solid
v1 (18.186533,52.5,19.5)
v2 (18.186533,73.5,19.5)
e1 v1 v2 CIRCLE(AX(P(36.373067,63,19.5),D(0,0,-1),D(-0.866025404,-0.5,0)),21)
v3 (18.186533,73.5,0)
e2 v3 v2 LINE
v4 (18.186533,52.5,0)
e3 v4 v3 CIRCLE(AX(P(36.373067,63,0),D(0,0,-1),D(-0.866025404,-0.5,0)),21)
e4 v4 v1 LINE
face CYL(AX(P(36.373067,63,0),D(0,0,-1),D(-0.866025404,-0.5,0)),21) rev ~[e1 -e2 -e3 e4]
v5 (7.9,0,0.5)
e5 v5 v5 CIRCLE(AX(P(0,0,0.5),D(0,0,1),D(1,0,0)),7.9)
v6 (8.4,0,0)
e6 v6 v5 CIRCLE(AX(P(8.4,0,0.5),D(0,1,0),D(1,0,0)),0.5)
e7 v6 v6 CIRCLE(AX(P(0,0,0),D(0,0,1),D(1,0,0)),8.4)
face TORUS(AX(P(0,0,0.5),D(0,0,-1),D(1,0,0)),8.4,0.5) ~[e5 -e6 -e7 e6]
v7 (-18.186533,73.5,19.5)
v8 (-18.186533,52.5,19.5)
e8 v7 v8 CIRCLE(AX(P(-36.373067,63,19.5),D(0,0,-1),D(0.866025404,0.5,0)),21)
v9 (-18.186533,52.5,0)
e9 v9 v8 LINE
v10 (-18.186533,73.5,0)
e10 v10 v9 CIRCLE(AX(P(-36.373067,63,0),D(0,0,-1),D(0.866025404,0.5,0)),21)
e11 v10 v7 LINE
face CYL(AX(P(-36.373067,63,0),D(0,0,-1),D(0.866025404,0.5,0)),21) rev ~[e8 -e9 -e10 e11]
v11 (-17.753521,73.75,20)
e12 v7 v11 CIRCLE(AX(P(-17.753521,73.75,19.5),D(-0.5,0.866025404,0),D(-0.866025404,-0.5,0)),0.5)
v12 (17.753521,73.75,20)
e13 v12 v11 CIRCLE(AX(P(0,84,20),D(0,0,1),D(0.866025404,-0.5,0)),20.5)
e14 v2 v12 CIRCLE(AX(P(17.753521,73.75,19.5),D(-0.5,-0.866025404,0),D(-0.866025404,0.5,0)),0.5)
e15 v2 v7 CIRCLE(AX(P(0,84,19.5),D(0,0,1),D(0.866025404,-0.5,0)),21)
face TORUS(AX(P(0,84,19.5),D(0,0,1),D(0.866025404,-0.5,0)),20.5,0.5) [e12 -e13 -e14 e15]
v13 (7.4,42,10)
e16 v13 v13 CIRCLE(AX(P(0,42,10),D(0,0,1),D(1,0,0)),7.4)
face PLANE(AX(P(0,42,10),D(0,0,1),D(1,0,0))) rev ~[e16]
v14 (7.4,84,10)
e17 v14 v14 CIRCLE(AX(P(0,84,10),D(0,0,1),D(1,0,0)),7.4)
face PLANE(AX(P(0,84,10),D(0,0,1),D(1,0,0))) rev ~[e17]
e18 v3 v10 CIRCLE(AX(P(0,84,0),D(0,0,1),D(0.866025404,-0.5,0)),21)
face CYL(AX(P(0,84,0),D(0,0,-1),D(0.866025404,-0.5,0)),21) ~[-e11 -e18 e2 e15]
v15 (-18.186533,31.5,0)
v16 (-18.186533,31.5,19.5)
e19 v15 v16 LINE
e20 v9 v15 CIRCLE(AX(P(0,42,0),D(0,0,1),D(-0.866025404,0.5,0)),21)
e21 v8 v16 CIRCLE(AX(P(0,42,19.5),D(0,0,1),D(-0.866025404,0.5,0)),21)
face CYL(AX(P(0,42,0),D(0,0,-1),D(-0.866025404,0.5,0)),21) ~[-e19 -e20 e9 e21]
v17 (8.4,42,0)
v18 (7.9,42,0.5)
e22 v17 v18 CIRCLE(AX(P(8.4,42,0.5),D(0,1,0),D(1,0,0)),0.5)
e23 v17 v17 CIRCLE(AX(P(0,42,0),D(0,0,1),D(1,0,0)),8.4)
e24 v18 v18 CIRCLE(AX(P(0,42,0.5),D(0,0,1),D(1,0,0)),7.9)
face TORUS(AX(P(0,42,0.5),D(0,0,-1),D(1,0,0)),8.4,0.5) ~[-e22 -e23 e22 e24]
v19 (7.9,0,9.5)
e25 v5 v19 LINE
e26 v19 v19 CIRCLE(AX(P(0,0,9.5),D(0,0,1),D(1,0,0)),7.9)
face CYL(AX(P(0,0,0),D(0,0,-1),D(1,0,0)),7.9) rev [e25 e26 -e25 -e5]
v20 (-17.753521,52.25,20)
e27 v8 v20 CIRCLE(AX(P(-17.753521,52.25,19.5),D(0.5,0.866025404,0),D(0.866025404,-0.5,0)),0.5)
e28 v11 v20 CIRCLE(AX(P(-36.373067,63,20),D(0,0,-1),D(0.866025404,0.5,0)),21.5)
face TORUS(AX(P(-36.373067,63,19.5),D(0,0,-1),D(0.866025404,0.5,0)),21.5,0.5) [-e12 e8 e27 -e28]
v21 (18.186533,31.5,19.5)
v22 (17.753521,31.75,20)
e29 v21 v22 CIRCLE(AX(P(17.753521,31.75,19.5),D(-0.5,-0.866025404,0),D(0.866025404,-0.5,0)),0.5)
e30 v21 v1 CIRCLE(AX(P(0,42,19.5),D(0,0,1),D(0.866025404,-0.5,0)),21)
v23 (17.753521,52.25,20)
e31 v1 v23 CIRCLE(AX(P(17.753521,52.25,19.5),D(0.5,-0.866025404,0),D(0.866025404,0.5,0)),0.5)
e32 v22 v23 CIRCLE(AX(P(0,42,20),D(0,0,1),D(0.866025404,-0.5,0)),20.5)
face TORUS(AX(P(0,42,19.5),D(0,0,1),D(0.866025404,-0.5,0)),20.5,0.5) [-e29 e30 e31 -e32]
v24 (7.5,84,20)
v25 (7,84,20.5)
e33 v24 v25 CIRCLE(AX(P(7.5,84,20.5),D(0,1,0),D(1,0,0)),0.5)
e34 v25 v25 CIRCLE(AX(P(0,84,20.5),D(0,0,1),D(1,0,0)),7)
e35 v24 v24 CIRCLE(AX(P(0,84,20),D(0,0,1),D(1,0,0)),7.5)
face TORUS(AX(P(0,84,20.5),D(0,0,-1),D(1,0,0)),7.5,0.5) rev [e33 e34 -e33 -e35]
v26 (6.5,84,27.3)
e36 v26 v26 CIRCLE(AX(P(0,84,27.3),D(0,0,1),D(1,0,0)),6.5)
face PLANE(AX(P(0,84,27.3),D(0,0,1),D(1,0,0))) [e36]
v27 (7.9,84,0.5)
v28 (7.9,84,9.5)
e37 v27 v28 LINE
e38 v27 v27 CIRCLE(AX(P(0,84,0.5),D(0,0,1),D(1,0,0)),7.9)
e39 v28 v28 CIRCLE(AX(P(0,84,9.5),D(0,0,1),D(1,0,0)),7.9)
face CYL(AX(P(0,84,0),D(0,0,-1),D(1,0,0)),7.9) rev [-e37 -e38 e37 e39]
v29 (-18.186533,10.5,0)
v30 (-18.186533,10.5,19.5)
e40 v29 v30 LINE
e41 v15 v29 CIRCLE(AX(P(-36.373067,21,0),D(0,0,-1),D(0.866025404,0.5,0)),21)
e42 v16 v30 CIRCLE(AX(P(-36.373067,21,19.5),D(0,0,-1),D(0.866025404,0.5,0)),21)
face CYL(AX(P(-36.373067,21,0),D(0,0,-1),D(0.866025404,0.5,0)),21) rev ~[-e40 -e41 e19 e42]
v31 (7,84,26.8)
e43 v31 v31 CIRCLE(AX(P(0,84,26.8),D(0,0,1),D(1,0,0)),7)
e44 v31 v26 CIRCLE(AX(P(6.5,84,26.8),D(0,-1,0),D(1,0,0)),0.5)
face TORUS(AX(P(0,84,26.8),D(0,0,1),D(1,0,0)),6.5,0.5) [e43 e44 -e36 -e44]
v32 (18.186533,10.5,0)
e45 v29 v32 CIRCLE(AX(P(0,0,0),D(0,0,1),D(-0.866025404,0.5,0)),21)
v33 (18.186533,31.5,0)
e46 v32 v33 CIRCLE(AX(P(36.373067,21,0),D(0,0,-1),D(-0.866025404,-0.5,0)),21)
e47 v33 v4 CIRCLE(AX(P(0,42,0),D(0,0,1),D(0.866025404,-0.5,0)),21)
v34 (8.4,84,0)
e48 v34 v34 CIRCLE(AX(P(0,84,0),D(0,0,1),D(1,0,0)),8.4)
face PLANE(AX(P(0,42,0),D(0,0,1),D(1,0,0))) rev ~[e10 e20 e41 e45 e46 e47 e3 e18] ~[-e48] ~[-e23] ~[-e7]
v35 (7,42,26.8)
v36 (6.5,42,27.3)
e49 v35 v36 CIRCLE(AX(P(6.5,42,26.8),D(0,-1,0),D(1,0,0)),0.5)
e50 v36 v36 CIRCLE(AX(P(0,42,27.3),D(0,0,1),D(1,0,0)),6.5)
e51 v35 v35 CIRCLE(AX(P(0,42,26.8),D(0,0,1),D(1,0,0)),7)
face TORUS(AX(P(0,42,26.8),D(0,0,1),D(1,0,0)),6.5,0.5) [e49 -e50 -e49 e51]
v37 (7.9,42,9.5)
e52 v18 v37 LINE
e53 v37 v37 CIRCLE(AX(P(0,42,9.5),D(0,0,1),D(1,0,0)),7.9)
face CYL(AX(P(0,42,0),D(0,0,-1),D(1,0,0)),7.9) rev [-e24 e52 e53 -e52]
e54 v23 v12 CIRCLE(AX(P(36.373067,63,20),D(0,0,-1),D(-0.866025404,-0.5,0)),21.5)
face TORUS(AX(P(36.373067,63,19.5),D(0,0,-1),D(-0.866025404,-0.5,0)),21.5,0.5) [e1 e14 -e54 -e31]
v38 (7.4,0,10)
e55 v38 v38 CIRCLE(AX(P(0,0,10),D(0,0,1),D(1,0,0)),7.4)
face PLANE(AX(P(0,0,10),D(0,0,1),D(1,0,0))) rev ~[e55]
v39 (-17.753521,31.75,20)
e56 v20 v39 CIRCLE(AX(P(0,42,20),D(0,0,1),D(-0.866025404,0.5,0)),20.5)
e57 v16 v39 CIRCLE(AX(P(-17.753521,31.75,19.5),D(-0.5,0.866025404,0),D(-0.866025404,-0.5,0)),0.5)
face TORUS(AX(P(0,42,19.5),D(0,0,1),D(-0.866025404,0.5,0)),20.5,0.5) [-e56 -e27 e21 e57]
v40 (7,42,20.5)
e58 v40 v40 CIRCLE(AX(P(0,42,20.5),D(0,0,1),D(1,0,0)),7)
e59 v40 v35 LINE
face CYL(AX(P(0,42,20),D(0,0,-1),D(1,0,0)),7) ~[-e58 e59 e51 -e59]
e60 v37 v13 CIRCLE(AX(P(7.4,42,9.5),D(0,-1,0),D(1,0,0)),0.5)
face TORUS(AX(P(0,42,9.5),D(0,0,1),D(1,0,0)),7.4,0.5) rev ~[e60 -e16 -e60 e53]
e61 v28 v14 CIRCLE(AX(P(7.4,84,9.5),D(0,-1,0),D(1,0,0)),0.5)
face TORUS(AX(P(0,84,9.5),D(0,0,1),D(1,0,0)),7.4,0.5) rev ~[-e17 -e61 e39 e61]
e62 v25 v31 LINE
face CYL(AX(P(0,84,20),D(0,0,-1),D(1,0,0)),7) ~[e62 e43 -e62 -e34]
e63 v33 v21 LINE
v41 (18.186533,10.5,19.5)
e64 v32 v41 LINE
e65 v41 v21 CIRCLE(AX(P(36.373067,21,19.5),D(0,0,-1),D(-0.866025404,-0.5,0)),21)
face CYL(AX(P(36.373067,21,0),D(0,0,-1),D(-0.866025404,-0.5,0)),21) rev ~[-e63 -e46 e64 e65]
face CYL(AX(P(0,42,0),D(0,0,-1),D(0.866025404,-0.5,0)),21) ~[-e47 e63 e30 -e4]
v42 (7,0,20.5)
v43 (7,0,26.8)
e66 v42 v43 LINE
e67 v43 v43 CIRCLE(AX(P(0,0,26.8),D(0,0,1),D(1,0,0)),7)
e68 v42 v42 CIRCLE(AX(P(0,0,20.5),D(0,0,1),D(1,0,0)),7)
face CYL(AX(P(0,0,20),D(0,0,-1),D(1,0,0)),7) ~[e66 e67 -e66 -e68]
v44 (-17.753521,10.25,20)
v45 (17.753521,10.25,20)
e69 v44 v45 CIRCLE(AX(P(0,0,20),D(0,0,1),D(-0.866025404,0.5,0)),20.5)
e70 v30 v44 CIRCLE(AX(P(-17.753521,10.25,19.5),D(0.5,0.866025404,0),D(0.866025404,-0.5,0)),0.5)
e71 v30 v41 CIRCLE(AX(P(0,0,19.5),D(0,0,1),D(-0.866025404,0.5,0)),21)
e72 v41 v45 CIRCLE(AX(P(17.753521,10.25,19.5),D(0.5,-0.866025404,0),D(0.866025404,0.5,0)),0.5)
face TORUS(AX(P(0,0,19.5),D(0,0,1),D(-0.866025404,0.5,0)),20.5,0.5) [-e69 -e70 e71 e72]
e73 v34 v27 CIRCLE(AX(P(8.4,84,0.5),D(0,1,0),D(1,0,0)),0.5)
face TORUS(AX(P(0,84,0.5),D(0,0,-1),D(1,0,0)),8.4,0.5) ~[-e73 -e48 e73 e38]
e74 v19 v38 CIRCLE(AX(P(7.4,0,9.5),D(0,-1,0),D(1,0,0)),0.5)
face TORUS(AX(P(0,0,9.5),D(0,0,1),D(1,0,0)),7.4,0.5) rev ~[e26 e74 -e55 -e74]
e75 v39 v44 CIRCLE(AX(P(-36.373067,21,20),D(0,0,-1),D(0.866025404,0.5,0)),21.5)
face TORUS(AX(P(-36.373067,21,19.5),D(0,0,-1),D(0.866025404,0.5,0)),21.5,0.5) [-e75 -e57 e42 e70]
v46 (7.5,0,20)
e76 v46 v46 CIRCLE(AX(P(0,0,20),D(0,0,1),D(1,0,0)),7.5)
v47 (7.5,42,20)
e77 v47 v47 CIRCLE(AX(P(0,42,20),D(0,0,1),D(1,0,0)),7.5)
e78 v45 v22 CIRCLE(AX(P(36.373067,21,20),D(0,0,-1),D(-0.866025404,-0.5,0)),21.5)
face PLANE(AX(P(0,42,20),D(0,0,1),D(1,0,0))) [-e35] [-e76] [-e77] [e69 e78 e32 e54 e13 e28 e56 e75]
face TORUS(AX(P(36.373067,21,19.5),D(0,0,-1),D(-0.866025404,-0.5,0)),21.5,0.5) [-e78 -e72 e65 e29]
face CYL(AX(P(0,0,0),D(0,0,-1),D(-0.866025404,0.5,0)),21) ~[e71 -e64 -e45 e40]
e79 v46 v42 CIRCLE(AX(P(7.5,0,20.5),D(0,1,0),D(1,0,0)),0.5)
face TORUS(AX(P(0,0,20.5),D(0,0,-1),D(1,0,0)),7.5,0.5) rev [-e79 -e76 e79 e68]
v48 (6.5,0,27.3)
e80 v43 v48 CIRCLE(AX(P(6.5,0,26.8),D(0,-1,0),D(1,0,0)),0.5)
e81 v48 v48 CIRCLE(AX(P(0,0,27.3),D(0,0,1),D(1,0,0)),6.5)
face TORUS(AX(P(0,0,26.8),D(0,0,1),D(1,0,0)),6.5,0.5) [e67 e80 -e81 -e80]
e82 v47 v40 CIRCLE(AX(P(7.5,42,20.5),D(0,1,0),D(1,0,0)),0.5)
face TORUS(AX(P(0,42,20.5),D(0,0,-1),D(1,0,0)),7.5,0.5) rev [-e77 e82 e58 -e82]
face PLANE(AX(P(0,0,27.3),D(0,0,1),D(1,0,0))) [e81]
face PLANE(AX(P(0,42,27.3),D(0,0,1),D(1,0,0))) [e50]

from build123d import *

# Parameters (mm, degrees)
F4_R     = 7.9
F5_DEPTH = 20
F6_DEPTH = 10
F7_R     = 7
F8_DEPTH = 7.3
F9_R     = 0.5


# Not quite as in the source:
# - a feature names something its author has since deleted; it is built from what else it names


with BuildPart() as f5:
    # F4 (on Top) → F5 (new body)
    with BuildSketch(Plane.XY):
        with BuildLine():
            ThreePointArc((18.1865334795, 10.5), (15.3730669589, 21), (18.1865334795, 31.5))
            ThreePointArc((18.1865334795, 31.5), (21, 42), (18.1865334795, 52.5))
            ThreePointArc((18.1865334795, 52.5), (15.3730669589, 63), (18.1865334795, 73.5))
            ThreePointArc((18.1865334795, 73.5), (0, 105), (-18.1865334795, 73.5))
            ThreePointArc((-18.1865334795, 73.5), (-15.3730669589, 63), (-18.1865334795, 52.5))
            ThreePointArc((-18.1865334795, 52.5), (-21, 42), (-18.1865334795, 31.5))
            ThreePointArc((-18.1865334795, 31.5), (-15.3730669589, 21), (-18.1865334795, 10.5))
            ThreePointArc((-18.1865334795, 10.5), (0, -21), (18.1865334795, 10.5))
        make_face()
        Circle(F4_R, mode=Mode.SUBTRACT)
        with Locations((0, 42)):
            Circle(F4_R, mode=Mode.SUBTRACT)
        with Locations((0, 84)):
            Circle(F4_R, mode=Mode.SUBTRACT)
        with Locations((0, 42)):
            Circle(F4_R)
        Circle(F4_R)
        with Locations((0, 84)):
            Circle(F4_R)
    extrude(amount=F5_DEPTH)

    # F4 (on Top) → F6 (cut)
    with BuildSketch(Plane.XY):
        with Locations((0, 42)):
            Circle(F4_R)
        Circle(F4_R)
        with Locations((0, 84)):
            Circle(F4_R)
    extrude(amount=F6_DEPTH, mode=Mode.SUBTRACT)

    # F7 (on face) → F8 (join)
    with BuildSketch(Plane.XY.offset(20)):
        Circle(F7_R)
        with Locations((0, 42)):
            Circle(F7_R)
        with Locations((0, 84)):
            Circle(F7_R)
    extrude(amount=F8_DEPTH)

    # F9
    f9_edges = [f5.edges().sort_by_distance(p)[0] for p in [
        (-7, 0, 27.3),
        (-7.9, 42, 0),
        (-7.9, 42, 10),
        (-7.9, 0, 0),
        (-7.9, 0, 10),
        (-7, 42, 27.3),
        (-7, 42, 20),
        (21, 42, 20),
        (-7, 84, 27.3),
        (-7, 84, 20),
        (-7.9, 84, 10),
        (-7.9, 84, 0),
        (-7, 0, 20),
    ]]
    fillet(f9_edges, radius=F9_R)


solid = f5.part
